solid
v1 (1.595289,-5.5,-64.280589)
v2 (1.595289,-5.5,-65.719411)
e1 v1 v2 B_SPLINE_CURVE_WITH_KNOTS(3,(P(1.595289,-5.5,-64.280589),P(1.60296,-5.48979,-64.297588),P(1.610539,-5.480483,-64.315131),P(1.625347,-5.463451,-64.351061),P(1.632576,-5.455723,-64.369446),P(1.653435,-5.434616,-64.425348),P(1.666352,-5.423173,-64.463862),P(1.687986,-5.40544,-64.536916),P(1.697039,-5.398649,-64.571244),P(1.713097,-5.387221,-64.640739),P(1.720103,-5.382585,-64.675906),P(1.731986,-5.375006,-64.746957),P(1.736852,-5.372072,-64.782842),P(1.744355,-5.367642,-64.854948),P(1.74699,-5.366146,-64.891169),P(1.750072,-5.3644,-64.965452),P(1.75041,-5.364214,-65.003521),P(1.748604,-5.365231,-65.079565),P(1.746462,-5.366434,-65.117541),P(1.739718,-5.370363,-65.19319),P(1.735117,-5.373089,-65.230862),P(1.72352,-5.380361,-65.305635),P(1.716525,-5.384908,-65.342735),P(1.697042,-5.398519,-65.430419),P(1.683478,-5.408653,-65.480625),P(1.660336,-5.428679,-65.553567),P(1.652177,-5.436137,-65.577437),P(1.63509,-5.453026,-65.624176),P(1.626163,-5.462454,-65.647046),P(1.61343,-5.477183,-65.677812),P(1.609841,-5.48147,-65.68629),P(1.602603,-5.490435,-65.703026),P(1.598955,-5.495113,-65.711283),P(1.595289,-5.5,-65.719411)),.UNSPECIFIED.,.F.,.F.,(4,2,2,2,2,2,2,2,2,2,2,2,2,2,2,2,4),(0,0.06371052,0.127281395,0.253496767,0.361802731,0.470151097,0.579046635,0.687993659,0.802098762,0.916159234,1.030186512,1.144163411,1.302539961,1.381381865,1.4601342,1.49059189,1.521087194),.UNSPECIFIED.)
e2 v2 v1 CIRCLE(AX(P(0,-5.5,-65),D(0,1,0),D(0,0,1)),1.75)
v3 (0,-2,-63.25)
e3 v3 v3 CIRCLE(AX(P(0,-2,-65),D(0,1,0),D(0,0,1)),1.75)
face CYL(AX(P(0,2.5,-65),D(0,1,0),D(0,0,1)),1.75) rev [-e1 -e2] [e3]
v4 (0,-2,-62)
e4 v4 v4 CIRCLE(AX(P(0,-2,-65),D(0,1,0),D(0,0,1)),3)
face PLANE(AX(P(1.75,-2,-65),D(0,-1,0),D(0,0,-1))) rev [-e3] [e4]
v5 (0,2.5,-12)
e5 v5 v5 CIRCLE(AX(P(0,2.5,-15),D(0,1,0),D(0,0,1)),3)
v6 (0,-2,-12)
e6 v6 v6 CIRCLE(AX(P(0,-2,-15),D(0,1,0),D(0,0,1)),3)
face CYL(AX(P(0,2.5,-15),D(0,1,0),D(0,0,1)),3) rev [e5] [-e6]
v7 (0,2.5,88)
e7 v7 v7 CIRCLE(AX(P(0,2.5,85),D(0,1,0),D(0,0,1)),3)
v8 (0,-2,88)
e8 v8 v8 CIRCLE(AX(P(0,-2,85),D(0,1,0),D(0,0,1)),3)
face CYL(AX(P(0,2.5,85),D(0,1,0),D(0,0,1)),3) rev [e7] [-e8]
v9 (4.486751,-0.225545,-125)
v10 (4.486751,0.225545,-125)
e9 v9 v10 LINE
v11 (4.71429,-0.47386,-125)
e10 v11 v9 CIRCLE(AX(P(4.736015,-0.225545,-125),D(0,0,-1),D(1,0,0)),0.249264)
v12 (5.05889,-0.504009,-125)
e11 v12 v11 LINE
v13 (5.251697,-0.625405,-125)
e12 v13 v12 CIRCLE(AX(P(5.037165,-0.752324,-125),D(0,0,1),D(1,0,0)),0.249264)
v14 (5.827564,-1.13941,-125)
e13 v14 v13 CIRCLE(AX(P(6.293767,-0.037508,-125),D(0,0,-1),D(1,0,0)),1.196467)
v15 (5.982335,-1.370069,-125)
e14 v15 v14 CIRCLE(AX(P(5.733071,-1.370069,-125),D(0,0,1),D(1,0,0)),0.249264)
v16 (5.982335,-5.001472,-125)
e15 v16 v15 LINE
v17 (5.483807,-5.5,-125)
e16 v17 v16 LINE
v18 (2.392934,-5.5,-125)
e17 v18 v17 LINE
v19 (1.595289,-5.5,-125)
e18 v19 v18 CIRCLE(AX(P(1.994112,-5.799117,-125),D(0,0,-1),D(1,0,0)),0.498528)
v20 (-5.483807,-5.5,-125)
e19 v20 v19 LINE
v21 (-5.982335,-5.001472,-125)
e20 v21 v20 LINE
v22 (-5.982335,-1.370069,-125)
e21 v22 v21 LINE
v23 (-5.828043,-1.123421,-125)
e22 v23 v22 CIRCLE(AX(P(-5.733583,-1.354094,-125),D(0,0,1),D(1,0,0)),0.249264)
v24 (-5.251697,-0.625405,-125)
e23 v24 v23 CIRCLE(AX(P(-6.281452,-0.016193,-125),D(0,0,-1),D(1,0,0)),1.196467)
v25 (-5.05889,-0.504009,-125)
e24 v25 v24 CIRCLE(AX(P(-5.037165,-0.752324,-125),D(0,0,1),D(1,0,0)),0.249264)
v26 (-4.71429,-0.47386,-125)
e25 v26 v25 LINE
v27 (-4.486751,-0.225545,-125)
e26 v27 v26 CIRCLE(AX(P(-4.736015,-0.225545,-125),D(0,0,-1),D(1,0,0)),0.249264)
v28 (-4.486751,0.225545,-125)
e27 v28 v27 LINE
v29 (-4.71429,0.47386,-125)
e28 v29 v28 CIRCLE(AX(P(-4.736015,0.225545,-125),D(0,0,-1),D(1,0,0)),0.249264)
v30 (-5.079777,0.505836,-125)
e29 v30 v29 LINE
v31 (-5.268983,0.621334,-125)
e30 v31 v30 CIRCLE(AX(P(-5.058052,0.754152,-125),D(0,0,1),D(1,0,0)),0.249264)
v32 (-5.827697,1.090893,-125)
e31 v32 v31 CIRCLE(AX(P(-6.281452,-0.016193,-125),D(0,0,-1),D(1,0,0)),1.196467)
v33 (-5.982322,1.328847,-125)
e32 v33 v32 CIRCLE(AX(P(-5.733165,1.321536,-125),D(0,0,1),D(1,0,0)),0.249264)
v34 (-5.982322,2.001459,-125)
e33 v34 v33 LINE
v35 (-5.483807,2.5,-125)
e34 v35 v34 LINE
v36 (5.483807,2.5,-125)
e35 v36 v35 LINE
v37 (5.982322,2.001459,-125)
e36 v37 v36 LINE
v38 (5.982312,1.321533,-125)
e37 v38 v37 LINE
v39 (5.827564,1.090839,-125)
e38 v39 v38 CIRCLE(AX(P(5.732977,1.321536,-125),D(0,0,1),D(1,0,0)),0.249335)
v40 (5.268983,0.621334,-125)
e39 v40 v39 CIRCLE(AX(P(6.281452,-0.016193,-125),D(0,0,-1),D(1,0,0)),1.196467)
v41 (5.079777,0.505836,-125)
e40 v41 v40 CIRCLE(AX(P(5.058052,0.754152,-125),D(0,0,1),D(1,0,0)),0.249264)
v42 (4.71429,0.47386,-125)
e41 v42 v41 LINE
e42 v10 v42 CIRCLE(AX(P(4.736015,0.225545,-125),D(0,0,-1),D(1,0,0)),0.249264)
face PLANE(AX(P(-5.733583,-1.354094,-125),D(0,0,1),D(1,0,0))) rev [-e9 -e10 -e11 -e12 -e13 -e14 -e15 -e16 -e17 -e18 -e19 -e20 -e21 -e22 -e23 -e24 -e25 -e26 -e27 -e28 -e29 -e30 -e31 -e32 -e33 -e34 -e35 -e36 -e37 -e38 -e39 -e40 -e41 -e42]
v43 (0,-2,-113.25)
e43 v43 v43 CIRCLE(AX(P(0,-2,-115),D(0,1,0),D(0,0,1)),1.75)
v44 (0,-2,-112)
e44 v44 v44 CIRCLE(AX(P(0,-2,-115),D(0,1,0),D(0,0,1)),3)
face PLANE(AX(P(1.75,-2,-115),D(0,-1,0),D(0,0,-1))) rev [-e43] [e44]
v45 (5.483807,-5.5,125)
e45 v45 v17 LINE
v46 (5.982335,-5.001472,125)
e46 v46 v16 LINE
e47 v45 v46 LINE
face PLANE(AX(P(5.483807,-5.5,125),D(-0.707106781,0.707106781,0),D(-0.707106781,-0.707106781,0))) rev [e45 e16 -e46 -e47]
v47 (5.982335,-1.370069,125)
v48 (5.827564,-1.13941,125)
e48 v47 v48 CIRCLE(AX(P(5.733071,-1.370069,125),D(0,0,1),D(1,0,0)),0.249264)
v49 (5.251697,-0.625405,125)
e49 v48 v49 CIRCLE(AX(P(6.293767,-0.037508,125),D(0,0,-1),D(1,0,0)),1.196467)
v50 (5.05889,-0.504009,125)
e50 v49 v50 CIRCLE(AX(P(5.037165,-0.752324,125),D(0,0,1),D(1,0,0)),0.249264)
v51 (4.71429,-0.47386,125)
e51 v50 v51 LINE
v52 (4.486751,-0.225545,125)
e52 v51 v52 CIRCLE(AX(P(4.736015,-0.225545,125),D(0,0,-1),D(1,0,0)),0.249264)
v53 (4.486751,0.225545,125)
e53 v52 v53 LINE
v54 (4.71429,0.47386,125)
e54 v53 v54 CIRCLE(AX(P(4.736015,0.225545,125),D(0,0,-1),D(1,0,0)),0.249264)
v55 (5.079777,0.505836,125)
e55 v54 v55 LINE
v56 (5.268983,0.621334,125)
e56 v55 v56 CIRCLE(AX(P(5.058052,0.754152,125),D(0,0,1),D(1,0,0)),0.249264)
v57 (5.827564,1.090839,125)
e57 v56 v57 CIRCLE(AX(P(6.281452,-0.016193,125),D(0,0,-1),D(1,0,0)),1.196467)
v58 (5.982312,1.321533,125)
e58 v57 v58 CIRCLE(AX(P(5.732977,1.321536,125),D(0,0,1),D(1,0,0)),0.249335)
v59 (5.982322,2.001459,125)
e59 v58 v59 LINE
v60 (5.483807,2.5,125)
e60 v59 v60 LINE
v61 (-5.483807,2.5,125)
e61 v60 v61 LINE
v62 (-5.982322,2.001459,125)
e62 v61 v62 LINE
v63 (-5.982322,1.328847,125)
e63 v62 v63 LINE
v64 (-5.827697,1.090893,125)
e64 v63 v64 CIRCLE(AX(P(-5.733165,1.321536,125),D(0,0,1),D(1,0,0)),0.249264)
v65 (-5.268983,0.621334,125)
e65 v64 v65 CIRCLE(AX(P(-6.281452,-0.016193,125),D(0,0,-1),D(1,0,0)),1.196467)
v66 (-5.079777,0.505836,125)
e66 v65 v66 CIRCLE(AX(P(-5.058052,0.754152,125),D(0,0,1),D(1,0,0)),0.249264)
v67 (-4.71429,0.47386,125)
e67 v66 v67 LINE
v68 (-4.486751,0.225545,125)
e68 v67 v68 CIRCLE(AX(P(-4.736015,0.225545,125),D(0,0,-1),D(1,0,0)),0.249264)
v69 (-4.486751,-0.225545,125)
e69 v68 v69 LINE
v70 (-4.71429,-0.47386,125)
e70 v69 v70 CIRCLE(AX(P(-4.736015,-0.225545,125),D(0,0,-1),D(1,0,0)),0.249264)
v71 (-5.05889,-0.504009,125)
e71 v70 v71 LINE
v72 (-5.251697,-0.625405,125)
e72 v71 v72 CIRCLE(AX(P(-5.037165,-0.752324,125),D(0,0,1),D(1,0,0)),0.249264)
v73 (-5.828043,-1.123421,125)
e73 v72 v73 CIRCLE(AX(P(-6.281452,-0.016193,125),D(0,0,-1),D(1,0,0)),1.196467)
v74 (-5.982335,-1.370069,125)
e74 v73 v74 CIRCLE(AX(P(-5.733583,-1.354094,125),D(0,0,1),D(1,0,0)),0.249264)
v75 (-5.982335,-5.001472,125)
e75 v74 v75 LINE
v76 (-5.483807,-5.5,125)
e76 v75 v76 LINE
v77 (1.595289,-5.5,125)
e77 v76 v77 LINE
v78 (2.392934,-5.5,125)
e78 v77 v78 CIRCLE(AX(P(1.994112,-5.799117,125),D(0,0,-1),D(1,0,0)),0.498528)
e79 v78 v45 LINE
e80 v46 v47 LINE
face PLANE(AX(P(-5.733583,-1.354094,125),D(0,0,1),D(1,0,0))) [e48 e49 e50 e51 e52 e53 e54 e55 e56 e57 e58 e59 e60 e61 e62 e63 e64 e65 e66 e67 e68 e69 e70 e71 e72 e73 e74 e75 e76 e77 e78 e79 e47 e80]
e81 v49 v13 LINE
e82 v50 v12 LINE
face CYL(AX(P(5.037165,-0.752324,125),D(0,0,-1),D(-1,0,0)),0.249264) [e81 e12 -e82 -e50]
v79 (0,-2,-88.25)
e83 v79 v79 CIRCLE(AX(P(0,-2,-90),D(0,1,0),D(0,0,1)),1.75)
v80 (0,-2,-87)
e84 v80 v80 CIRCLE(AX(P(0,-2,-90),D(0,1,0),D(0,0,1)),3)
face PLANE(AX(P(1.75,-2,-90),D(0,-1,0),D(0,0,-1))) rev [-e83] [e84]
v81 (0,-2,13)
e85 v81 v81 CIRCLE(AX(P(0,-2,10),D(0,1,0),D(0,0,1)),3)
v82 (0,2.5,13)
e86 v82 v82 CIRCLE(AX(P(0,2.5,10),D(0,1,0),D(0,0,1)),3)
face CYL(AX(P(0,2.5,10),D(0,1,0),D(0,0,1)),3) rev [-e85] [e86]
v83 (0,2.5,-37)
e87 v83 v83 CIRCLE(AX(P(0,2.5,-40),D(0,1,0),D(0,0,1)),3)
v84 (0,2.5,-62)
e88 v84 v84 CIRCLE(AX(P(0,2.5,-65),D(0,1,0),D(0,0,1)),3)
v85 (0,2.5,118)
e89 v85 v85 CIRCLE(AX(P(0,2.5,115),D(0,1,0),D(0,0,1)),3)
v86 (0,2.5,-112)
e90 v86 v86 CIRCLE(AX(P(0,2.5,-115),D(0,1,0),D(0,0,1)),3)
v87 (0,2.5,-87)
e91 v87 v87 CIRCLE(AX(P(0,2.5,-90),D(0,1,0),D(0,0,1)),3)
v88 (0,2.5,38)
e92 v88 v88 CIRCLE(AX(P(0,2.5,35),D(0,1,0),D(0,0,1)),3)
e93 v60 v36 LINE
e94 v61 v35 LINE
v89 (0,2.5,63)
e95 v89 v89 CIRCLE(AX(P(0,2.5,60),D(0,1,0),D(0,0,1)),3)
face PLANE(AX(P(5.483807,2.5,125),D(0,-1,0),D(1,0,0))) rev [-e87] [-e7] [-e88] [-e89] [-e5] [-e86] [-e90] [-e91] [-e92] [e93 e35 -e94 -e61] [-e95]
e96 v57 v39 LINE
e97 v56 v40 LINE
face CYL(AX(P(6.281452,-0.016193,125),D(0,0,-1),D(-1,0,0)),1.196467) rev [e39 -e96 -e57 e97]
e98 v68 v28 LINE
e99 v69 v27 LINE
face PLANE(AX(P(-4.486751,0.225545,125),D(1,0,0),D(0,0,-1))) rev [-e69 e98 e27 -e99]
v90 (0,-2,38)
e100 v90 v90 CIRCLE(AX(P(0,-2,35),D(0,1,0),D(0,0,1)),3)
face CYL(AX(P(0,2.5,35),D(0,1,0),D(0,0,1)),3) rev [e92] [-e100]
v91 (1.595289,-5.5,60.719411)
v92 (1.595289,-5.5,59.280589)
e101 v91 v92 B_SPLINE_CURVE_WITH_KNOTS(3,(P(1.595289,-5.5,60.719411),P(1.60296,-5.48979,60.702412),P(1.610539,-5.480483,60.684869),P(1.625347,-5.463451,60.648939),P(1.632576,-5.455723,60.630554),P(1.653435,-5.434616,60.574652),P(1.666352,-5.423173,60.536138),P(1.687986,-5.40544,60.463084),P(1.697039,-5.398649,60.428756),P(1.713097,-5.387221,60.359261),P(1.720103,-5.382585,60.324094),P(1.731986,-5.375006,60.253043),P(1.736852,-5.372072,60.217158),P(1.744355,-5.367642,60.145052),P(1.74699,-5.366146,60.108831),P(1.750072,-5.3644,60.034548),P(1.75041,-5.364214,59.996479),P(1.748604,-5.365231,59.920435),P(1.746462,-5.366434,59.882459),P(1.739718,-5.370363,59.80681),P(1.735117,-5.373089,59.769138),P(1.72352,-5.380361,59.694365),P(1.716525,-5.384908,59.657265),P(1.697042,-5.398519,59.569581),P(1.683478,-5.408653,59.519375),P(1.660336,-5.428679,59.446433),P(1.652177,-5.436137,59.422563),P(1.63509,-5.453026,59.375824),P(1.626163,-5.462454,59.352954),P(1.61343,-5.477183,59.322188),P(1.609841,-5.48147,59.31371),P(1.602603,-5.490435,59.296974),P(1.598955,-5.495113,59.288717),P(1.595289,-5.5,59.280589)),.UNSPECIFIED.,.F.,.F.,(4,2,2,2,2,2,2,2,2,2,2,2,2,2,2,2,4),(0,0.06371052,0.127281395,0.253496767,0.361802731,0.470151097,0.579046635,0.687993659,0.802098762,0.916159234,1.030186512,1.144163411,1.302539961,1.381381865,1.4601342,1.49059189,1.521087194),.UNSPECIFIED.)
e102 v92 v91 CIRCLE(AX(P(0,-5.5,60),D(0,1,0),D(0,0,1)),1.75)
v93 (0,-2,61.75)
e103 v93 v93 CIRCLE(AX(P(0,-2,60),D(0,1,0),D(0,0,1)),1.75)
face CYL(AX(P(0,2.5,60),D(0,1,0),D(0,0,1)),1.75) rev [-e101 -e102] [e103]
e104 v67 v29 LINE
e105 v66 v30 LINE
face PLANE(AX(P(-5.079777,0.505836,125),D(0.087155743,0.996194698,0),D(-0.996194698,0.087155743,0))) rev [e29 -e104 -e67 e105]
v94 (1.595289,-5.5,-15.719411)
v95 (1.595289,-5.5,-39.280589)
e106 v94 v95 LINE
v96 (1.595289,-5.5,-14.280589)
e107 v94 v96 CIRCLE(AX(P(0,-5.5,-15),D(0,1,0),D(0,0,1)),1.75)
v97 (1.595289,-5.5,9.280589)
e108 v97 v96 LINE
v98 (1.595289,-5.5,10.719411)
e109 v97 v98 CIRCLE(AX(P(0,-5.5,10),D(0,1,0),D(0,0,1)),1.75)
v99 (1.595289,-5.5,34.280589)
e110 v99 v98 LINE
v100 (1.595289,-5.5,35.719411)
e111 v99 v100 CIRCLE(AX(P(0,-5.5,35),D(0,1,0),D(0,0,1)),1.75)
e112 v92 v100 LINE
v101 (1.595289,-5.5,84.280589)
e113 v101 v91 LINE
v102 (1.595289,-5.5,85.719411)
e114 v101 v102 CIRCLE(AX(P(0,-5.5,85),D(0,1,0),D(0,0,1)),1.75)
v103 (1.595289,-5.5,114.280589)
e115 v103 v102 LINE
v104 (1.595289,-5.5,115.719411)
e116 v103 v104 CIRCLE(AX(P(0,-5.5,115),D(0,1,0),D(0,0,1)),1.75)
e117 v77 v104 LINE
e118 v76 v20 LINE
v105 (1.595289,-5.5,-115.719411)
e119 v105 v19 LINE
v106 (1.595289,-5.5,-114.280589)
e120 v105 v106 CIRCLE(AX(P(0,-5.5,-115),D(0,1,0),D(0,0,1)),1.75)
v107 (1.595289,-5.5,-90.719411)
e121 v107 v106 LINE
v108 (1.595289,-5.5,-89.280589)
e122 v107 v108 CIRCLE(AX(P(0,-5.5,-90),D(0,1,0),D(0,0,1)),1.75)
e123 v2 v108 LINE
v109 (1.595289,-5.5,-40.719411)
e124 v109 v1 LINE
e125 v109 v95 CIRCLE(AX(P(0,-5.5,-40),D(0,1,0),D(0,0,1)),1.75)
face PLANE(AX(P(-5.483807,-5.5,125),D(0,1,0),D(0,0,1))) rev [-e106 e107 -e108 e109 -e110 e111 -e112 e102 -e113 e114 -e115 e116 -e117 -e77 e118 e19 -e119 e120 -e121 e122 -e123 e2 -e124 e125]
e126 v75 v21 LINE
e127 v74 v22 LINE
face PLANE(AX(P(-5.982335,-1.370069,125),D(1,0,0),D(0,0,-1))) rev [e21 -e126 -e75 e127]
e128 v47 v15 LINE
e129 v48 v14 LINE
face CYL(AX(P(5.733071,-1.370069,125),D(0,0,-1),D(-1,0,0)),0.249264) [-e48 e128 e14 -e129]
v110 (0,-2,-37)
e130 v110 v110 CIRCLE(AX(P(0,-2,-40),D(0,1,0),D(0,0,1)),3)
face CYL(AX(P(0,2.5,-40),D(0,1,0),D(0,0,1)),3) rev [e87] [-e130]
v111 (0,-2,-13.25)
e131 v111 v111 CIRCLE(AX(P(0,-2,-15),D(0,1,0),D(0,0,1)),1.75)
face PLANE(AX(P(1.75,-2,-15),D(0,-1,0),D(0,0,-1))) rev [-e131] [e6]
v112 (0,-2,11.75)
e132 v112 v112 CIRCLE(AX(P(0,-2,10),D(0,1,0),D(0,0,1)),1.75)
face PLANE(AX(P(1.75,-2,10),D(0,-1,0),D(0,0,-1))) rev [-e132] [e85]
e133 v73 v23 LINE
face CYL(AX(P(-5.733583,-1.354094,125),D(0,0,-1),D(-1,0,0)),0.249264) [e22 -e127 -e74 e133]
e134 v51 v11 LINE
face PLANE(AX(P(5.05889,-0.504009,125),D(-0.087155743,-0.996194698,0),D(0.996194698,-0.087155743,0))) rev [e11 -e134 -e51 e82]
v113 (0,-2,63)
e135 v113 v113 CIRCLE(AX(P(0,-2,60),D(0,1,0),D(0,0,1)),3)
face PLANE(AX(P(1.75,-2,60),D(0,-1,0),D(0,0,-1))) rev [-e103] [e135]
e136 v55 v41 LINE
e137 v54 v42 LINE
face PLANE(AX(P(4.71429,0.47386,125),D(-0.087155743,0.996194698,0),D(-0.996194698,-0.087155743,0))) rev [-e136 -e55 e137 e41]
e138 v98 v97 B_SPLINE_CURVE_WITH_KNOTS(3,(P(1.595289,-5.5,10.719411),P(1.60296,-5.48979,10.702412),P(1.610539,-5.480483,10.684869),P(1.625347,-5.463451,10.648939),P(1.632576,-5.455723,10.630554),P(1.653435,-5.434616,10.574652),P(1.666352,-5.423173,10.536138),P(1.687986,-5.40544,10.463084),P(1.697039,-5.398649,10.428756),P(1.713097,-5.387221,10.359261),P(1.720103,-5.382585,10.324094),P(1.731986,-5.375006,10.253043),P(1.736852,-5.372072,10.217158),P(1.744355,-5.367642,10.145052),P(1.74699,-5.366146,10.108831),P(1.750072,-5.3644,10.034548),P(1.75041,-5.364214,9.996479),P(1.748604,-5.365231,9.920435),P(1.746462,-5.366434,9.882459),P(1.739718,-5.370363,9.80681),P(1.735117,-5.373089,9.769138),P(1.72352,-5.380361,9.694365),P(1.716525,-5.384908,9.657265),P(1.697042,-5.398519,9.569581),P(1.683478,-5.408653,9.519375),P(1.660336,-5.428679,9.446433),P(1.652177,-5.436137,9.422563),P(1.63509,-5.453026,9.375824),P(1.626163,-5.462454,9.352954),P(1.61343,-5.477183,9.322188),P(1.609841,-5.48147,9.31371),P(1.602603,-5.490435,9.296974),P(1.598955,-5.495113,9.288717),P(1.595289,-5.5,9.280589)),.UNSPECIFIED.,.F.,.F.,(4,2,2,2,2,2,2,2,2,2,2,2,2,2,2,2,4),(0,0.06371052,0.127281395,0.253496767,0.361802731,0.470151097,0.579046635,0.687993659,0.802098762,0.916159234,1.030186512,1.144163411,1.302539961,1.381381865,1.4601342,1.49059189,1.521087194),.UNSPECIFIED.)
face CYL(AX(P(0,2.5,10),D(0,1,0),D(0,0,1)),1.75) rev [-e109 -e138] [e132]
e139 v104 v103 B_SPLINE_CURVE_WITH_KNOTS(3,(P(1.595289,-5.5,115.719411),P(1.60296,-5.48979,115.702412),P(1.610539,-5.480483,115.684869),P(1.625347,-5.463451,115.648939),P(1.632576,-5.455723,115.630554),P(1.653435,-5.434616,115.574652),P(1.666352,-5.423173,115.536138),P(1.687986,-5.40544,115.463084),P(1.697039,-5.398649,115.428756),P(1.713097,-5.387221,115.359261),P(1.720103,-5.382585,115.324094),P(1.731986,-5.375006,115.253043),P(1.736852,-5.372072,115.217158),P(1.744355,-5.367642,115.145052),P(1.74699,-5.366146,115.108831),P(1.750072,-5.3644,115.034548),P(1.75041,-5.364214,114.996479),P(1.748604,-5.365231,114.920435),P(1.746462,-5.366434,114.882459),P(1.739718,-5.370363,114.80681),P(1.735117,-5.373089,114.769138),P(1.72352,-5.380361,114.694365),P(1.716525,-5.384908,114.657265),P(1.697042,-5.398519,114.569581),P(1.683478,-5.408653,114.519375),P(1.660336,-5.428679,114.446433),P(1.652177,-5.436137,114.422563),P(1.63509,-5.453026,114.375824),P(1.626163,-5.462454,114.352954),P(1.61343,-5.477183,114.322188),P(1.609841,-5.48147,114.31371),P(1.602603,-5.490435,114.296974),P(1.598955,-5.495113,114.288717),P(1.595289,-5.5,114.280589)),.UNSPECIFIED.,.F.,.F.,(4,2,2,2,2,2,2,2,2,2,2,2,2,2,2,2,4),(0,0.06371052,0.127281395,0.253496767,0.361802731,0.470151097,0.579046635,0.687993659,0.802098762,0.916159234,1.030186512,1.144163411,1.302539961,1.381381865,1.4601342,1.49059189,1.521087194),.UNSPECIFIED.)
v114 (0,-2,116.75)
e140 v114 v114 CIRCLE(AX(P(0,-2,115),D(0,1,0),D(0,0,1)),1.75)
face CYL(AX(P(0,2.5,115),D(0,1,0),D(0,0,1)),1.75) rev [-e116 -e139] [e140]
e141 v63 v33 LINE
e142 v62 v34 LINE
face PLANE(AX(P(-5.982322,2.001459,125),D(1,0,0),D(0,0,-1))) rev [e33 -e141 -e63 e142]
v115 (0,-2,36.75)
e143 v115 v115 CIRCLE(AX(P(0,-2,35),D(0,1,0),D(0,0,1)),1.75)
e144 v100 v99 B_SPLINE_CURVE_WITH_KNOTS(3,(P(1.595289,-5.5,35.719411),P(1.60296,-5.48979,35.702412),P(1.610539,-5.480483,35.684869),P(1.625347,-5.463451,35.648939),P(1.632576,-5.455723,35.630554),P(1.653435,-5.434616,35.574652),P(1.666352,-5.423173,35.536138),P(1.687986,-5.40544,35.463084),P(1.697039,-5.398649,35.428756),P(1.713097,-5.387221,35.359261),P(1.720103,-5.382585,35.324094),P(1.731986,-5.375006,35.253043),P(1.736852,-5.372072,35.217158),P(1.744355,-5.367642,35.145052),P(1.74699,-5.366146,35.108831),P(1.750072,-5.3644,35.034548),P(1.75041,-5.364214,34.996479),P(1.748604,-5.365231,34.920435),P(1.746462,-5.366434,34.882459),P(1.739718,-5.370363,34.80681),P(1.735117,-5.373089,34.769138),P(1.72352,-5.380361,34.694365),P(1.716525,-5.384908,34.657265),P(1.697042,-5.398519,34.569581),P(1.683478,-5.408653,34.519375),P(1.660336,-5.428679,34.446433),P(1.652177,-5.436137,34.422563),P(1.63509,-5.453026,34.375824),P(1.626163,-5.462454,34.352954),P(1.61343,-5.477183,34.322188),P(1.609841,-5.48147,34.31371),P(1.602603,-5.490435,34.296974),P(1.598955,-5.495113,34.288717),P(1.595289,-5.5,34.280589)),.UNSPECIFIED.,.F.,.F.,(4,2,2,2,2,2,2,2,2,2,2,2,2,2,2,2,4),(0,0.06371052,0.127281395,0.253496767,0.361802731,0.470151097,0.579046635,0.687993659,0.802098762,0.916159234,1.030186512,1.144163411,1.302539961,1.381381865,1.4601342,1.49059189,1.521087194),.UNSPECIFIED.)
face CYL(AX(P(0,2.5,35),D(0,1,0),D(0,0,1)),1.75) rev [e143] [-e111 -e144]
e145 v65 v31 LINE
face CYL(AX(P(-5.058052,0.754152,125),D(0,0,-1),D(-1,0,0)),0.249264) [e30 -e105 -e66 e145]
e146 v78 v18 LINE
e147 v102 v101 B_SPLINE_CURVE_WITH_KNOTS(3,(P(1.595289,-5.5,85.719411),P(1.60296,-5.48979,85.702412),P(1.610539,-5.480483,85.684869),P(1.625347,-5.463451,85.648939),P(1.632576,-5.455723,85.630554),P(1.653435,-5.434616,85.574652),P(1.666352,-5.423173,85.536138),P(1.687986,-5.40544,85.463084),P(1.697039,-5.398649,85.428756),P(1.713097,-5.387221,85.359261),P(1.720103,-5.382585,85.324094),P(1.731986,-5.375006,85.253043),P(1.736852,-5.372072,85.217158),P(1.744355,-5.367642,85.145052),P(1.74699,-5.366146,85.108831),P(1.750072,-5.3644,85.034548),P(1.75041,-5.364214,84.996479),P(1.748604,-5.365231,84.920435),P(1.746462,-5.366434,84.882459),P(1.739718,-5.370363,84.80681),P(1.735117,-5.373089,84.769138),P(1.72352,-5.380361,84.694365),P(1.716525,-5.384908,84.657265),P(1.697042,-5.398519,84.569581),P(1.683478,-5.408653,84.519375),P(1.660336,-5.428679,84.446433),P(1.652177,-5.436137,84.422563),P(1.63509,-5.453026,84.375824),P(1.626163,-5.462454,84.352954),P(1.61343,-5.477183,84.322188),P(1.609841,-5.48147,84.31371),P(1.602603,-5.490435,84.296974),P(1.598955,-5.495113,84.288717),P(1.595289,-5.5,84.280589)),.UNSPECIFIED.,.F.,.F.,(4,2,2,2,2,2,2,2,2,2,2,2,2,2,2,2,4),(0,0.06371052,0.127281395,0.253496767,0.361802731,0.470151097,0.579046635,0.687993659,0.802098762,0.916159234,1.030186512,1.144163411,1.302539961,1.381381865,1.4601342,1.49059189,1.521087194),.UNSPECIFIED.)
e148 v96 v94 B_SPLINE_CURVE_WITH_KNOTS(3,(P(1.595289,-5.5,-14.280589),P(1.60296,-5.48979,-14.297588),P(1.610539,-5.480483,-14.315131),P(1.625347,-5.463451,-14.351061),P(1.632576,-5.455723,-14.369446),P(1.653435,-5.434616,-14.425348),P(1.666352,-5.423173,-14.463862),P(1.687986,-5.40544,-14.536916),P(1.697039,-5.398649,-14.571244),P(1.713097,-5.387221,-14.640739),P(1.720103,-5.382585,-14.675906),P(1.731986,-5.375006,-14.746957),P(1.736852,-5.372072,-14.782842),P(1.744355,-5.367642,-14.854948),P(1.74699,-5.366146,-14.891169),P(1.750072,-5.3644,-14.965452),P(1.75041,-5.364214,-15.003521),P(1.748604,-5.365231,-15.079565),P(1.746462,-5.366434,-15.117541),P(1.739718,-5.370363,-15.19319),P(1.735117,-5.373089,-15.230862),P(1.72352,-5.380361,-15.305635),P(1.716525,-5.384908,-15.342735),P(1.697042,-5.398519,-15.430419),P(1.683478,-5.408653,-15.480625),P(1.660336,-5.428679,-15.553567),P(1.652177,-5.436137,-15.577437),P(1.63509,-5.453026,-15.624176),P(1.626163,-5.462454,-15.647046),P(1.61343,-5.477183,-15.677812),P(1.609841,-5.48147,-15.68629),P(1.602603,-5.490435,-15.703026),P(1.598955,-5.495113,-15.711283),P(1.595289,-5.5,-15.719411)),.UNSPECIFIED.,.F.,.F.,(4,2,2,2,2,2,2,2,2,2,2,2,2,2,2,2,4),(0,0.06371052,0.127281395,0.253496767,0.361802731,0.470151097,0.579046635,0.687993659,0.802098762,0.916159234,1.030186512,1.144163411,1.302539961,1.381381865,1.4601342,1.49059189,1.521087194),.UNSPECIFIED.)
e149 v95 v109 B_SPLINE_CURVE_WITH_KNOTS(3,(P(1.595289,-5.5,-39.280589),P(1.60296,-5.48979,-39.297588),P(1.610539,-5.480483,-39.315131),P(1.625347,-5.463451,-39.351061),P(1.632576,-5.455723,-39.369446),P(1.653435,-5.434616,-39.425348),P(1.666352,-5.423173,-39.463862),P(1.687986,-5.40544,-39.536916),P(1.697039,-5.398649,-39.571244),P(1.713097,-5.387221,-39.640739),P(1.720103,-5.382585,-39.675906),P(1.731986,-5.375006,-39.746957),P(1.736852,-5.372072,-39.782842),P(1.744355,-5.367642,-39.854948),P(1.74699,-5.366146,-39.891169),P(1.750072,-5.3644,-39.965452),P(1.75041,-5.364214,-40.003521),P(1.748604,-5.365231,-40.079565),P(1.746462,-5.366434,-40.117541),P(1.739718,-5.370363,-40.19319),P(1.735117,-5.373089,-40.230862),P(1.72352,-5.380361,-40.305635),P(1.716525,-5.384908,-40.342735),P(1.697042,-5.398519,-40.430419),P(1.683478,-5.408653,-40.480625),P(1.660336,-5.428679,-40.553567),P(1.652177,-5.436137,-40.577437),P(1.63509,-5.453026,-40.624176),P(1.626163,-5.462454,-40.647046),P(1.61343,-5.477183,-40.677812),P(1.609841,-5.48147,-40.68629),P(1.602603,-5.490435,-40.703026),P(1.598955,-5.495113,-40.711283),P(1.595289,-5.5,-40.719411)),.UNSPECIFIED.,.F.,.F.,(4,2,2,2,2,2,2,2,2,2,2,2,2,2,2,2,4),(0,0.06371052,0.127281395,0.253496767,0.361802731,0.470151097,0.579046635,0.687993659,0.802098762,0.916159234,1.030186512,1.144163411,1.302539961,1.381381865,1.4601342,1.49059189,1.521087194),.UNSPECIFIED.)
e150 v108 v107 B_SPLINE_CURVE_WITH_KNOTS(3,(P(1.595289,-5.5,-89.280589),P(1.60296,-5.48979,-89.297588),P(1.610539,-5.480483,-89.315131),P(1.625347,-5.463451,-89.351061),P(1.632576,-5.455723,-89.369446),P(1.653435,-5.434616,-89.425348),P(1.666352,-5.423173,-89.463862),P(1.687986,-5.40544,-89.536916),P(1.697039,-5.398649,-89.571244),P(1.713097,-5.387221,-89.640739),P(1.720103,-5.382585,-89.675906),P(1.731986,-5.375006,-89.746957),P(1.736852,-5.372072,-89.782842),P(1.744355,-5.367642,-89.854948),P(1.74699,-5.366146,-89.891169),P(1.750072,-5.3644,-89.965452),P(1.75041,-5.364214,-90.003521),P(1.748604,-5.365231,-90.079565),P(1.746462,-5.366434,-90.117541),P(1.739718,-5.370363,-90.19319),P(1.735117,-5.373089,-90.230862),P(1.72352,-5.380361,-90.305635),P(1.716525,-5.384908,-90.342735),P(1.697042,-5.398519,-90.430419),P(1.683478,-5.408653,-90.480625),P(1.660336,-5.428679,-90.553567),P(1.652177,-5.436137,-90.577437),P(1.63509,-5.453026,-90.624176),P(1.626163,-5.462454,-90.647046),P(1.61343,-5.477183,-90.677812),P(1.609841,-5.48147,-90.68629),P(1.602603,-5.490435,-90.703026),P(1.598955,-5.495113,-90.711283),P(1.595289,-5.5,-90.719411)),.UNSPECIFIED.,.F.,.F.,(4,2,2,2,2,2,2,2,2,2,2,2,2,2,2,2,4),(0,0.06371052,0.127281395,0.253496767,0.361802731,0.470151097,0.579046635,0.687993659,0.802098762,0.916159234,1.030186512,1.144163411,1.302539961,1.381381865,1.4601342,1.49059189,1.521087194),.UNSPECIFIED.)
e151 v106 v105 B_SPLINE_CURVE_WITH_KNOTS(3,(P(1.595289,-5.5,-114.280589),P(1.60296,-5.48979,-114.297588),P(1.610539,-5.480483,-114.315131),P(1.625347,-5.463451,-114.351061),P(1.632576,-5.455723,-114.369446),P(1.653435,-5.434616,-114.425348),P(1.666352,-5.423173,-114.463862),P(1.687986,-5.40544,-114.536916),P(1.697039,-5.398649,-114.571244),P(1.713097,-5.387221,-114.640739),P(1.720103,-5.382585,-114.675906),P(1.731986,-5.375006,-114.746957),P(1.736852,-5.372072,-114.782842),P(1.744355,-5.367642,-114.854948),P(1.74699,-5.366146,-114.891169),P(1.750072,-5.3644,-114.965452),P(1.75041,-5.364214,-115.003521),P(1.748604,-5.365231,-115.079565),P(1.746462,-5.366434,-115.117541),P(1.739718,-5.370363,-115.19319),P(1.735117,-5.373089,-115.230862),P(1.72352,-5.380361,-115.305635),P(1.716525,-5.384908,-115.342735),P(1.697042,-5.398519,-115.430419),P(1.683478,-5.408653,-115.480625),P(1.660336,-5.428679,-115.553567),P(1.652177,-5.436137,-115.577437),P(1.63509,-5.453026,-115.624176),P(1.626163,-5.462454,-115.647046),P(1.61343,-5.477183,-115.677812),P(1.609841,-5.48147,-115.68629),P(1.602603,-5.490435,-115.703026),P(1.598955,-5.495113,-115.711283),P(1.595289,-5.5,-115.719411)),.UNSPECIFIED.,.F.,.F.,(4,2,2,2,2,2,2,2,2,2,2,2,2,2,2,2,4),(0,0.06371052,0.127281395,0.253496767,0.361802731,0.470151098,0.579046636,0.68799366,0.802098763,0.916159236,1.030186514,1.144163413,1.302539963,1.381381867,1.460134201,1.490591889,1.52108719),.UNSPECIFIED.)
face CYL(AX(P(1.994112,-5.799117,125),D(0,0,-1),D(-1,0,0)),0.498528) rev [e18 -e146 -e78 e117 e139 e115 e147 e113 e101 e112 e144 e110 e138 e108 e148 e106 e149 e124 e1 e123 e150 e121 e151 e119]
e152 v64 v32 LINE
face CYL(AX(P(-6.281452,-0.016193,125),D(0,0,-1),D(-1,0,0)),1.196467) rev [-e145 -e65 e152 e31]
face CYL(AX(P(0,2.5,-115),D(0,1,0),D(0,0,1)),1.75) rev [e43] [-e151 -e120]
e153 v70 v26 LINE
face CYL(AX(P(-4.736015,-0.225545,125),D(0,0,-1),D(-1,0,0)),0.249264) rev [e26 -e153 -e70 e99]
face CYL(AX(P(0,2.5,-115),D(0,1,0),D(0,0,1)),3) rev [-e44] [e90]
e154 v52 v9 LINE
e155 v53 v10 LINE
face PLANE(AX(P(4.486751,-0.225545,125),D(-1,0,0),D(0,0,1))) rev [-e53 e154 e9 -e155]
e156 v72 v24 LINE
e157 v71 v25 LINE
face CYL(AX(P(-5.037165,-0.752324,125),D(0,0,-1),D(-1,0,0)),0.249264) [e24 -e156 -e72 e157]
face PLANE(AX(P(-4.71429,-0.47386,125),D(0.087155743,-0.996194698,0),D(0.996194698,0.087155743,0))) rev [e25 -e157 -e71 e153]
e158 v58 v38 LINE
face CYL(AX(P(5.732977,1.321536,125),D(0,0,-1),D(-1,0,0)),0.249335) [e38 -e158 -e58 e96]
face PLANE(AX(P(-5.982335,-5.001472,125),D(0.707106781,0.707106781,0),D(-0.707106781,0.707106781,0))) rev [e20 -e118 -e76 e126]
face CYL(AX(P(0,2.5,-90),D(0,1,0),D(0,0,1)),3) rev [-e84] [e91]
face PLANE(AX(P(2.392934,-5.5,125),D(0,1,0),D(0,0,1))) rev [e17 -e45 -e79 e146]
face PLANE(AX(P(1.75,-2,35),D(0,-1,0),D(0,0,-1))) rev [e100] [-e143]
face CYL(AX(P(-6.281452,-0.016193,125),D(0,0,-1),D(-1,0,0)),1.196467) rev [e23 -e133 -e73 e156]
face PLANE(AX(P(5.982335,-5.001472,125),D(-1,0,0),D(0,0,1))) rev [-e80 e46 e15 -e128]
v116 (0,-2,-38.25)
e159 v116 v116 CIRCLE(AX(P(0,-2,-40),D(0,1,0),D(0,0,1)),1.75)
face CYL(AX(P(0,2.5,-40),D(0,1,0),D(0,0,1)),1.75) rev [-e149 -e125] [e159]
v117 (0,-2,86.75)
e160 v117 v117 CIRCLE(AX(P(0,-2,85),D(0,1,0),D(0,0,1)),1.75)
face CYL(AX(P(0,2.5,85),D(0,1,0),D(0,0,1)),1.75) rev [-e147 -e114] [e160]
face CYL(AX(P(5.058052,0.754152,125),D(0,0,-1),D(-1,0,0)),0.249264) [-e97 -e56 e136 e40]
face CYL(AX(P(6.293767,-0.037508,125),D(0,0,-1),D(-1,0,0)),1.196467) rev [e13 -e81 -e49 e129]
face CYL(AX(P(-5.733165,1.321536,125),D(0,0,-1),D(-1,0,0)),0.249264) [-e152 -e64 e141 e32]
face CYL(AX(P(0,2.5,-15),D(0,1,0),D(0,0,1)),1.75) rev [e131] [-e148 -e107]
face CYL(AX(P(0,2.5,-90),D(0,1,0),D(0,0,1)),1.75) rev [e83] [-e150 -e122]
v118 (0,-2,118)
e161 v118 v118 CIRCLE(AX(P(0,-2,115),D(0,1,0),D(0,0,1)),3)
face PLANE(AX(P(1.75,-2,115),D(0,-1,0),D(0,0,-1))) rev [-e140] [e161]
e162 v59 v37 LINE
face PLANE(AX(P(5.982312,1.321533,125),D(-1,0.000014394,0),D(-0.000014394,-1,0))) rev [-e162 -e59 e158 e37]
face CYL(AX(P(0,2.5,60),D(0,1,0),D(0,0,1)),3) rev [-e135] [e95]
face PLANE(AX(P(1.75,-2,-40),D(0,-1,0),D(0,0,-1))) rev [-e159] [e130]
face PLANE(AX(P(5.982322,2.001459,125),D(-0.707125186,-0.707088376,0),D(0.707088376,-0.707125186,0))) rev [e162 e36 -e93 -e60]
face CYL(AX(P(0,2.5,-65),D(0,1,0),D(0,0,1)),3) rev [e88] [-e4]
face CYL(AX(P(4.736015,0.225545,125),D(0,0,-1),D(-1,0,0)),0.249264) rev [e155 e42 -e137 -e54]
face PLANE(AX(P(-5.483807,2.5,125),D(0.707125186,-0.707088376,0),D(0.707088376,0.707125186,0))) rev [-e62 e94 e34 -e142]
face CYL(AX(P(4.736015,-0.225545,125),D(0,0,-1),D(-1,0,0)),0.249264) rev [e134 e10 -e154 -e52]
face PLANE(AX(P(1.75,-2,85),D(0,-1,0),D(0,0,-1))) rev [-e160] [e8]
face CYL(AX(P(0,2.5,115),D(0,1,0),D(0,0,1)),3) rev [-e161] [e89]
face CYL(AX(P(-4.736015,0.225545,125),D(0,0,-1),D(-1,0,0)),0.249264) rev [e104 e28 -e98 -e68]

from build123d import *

# Parameters (mm, degrees)
RAIL_PROFILE_DEPTH             = 125
CBORE_FOR_M3_SHCS1_D           = 3.5
CBORE_FOR_M3_SHCS1_CBORE_D     = 6
CBORE_FOR_M3_SHCS1_CBORE_DEPTH = 4.5
FILL_START                     = -2.000000001
FILL_PATTERN1_OUTLINE_R        = 3
FILL_PATTERN1_DEPTH            = 4.5
FILL_START_2                   = -5.5
FILL_PATTERN1_2_OUTLINE_R      = 1.75
FILL_PATTERN1_2_DEPTH          = 3.499999999


# Read off the part's stored shape, not the designer's step: Fill Pattern1
with BuildPart() as part:
    # Sketch1 → RAIL PROFILE (new, symmetric)
    with BuildSketch(Plane.XY):
        with BuildLine():
            Line((-5.982334879, -1.370069213), (-5.982334879, -5.001472146))
            Line((-5.982334879, -5.001472146), (-5.483807025, -5.499999999))
            Line((-5.483807025, -5.499999999), (1.595289228, -5.499999999))
            ThreePointArc((1.595289228, -5.499999999), (1.994111552, -5.300588838), (2.392933875, -5.5))
            Line((2.392933875, -5.5), (5.483807024, -5.5))
            Line((5.483807024, -5.5), (5.982334878, -5.001472147))
            Line((5.982334878, -5.001472147), (5.982334878, -1.370069213))
            ThreePointArc((5.982334878, -1.370069213), (5.940056641, -1.231182813), (5.82756375, -1.139410101))
            ThreePointArc((5.82756375, -1.139410101), (5.497041405, -0.930122348), (5.251697363, -0.625405104))
            ThreePointArc((5.251697363, -0.625405104), (5.169975597, -0.541388466), (5.058890009, -0.504008866))
            Line((5.058890009, -0.504008866), (4.71429032, -0.473860299))
            ThreePointArc((4.71429032, -0.473860299), (4.552238438, -0.393945155), (4.486751147, -0.225544865))
            Line((4.486751147, -0.225544865), (4.486751147, 0.225544865))
            ThreePointArc((4.486751147, 0.225544865), (4.552238438, 0.393945155), (4.71429032, 0.473860299))
            Line((4.71429032, 0.473860299), (5.079776582, 0.505836204))
            ThreePointArc((5.079776582, 0.505836204), (5.187925163, 0.5413949), (5.268982803, 0.621333598))
            ThreePointArc((5.268982803, 0.621333598), (5.511607978, 0.899707672), (5.82756375, 1.09083865))
            ThreePointArc((5.82756375, 1.09083865), (5.940040963, 1.182638806), (5.982312115, 1.321532803))
            Line((5.982312115, 1.321532803), (5.982321902, 2.00145917))
            Line((5.982321902, 2.00145917), (5.483807025, 2.499999999))
            Line((5.483807025, 2.499999999), (-5.483807026, 2.499999999))
            Line((-5.483807026, 2.499999999), (-5.982321903, 2.00145917))
            Line((-5.982321903, 2.00145917), (-5.982321903, 1.32884687))
            ThreePointArc((-5.982321903, 1.32884687), (-5.942177076, 1.185718341), (-5.827697321, 1.090893402))
            ThreePointArc((-5.827697321, 1.090893402), (-5.511663234, 0.899754111), (-5.268982805, 0.621333597))
            ThreePointArc((-5.268982805, 0.621333597), (-5.187925164, 0.541394898), (-5.079776582, 0.505836204))
            Line((-5.079776582, 0.505836204), (-4.71429032, 0.473860299))
            ThreePointArc((-4.71429032, 0.473860299), (-4.552238438, 0.393945155), (-4.486751147, 0.225544865))
            Line((-4.486751147, 0.225544865), (-4.486751147, -0.225544865))
            ThreePointArc((-4.486751147, -0.225544865), (-4.552238438, -0.393945155), (-4.71429032, -0.473860299))
            Line((-4.71429032, -0.473860299), (-5.058890009, -0.504008866))
            ThreePointArc((-5.058890009, -0.504008866), (-5.169975597, -0.541388466), (-5.251697363, -0.625405104))
            ThreePointArc((-5.251697363, -0.625405104), (-5.499180752, -0.921502608), (-5.828043428, -1.123421157))
            ThreePointArc((-5.828043428, -1.123421157), (-5.944906256, -1.221900029), (-5.982334879, -1.370069213))
        make_face()
    extrude(amount=RAIL_PROFILE_DEPTH, both=True)

    # CBORE for M3 SHCS1 (through all)
    with Locations(Plane(origin=(0, 2.499999999, 0), x_dir=(1, 0, 0), z_dir=(0, 1, 0))):
        with Locations((0, 115)):
            cbore_for_m3_shcs1 = CounterBoreHole(CBORE_FOR_M3_SHCS1_D / 2, CBORE_FOR_M3_SHCS1_CBORE_D / 2, CBORE_FOR_M3_SHCS1_CBORE_DEPTH)

    # M3 END MIRROR: CBORE for M3 SHCS1 across plane
    add(cbore_for_m3_shcs1.mirror(Plane.XY), mode=Mode.SUBTRACT)

    # Fill Pattern1 outline → Fill Pattern1 (cut)
    with BuildSketch(Plane(origin=(0, 0, 0), x_dir=(1, 0, 0), z_dir=(0, 1, 0)).offset(FILL_START)):
        with Locations((0, 90)):
            Circle(FILL_PATTERN1_OUTLINE_R)
        with Locations((0, 65)):
            Circle(FILL_PATTERN1_OUTLINE_R)
        with Locations((0, 40)):
            Circle(FILL_PATTERN1_OUTLINE_R)
        with Locations((0, 15)):
            Circle(FILL_PATTERN1_OUTLINE_R)
        with Locations((0, -10)):
            Circle(FILL_PATTERN1_OUTLINE_R)
        with Locations((0, -35)):
            Circle(FILL_PATTERN1_OUTLINE_R)
        with Locations((0, -60)):
            Circle(FILL_PATTERN1_OUTLINE_R)
        with Locations((0, -85)):
            Circle(FILL_PATTERN1_OUTLINE_R)
    extrude(amount=FILL_PATTERN1_DEPTH, mode=Mode.SUBTRACT)

    # Fill Pattern1 2 outline → Fill Pattern1 2 (cut)
    with BuildSketch(Plane(origin=(0, 0, 0), x_dir=(1, 0, 0), z_dir=(0, 1, 0)).offset(FILL_START_2)):
        with Locations((0, 90)):
            Circle(FILL_PATTERN1_2_OUTLINE_R)
        with Locations((0, 65)):
            Circle(FILL_PATTERN1_2_OUTLINE_R)
        with Locations((0, 40)):
            Circle(FILL_PATTERN1_2_OUTLINE_R)
        with Locations((0, 15)):
            Circle(FILL_PATTERN1_2_OUTLINE_R)
        with Locations((0, -10)):
            Circle(FILL_PATTERN1_2_OUTLINE_R)
        with Locations((0, -35)):
            Circle(FILL_PATTERN1_2_OUTLINE_R)
        with Locations((0, -60)):
            Circle(FILL_PATTERN1_2_OUTLINE_R)
        with Locations((0, -85)):
            Circle(FILL_PATTERN1_2_OUTLINE_R)
    extrude(amount=FILL_PATTERN1_2_DEPTH, mode=Mode.SUBTRACT)


solid = part.part
